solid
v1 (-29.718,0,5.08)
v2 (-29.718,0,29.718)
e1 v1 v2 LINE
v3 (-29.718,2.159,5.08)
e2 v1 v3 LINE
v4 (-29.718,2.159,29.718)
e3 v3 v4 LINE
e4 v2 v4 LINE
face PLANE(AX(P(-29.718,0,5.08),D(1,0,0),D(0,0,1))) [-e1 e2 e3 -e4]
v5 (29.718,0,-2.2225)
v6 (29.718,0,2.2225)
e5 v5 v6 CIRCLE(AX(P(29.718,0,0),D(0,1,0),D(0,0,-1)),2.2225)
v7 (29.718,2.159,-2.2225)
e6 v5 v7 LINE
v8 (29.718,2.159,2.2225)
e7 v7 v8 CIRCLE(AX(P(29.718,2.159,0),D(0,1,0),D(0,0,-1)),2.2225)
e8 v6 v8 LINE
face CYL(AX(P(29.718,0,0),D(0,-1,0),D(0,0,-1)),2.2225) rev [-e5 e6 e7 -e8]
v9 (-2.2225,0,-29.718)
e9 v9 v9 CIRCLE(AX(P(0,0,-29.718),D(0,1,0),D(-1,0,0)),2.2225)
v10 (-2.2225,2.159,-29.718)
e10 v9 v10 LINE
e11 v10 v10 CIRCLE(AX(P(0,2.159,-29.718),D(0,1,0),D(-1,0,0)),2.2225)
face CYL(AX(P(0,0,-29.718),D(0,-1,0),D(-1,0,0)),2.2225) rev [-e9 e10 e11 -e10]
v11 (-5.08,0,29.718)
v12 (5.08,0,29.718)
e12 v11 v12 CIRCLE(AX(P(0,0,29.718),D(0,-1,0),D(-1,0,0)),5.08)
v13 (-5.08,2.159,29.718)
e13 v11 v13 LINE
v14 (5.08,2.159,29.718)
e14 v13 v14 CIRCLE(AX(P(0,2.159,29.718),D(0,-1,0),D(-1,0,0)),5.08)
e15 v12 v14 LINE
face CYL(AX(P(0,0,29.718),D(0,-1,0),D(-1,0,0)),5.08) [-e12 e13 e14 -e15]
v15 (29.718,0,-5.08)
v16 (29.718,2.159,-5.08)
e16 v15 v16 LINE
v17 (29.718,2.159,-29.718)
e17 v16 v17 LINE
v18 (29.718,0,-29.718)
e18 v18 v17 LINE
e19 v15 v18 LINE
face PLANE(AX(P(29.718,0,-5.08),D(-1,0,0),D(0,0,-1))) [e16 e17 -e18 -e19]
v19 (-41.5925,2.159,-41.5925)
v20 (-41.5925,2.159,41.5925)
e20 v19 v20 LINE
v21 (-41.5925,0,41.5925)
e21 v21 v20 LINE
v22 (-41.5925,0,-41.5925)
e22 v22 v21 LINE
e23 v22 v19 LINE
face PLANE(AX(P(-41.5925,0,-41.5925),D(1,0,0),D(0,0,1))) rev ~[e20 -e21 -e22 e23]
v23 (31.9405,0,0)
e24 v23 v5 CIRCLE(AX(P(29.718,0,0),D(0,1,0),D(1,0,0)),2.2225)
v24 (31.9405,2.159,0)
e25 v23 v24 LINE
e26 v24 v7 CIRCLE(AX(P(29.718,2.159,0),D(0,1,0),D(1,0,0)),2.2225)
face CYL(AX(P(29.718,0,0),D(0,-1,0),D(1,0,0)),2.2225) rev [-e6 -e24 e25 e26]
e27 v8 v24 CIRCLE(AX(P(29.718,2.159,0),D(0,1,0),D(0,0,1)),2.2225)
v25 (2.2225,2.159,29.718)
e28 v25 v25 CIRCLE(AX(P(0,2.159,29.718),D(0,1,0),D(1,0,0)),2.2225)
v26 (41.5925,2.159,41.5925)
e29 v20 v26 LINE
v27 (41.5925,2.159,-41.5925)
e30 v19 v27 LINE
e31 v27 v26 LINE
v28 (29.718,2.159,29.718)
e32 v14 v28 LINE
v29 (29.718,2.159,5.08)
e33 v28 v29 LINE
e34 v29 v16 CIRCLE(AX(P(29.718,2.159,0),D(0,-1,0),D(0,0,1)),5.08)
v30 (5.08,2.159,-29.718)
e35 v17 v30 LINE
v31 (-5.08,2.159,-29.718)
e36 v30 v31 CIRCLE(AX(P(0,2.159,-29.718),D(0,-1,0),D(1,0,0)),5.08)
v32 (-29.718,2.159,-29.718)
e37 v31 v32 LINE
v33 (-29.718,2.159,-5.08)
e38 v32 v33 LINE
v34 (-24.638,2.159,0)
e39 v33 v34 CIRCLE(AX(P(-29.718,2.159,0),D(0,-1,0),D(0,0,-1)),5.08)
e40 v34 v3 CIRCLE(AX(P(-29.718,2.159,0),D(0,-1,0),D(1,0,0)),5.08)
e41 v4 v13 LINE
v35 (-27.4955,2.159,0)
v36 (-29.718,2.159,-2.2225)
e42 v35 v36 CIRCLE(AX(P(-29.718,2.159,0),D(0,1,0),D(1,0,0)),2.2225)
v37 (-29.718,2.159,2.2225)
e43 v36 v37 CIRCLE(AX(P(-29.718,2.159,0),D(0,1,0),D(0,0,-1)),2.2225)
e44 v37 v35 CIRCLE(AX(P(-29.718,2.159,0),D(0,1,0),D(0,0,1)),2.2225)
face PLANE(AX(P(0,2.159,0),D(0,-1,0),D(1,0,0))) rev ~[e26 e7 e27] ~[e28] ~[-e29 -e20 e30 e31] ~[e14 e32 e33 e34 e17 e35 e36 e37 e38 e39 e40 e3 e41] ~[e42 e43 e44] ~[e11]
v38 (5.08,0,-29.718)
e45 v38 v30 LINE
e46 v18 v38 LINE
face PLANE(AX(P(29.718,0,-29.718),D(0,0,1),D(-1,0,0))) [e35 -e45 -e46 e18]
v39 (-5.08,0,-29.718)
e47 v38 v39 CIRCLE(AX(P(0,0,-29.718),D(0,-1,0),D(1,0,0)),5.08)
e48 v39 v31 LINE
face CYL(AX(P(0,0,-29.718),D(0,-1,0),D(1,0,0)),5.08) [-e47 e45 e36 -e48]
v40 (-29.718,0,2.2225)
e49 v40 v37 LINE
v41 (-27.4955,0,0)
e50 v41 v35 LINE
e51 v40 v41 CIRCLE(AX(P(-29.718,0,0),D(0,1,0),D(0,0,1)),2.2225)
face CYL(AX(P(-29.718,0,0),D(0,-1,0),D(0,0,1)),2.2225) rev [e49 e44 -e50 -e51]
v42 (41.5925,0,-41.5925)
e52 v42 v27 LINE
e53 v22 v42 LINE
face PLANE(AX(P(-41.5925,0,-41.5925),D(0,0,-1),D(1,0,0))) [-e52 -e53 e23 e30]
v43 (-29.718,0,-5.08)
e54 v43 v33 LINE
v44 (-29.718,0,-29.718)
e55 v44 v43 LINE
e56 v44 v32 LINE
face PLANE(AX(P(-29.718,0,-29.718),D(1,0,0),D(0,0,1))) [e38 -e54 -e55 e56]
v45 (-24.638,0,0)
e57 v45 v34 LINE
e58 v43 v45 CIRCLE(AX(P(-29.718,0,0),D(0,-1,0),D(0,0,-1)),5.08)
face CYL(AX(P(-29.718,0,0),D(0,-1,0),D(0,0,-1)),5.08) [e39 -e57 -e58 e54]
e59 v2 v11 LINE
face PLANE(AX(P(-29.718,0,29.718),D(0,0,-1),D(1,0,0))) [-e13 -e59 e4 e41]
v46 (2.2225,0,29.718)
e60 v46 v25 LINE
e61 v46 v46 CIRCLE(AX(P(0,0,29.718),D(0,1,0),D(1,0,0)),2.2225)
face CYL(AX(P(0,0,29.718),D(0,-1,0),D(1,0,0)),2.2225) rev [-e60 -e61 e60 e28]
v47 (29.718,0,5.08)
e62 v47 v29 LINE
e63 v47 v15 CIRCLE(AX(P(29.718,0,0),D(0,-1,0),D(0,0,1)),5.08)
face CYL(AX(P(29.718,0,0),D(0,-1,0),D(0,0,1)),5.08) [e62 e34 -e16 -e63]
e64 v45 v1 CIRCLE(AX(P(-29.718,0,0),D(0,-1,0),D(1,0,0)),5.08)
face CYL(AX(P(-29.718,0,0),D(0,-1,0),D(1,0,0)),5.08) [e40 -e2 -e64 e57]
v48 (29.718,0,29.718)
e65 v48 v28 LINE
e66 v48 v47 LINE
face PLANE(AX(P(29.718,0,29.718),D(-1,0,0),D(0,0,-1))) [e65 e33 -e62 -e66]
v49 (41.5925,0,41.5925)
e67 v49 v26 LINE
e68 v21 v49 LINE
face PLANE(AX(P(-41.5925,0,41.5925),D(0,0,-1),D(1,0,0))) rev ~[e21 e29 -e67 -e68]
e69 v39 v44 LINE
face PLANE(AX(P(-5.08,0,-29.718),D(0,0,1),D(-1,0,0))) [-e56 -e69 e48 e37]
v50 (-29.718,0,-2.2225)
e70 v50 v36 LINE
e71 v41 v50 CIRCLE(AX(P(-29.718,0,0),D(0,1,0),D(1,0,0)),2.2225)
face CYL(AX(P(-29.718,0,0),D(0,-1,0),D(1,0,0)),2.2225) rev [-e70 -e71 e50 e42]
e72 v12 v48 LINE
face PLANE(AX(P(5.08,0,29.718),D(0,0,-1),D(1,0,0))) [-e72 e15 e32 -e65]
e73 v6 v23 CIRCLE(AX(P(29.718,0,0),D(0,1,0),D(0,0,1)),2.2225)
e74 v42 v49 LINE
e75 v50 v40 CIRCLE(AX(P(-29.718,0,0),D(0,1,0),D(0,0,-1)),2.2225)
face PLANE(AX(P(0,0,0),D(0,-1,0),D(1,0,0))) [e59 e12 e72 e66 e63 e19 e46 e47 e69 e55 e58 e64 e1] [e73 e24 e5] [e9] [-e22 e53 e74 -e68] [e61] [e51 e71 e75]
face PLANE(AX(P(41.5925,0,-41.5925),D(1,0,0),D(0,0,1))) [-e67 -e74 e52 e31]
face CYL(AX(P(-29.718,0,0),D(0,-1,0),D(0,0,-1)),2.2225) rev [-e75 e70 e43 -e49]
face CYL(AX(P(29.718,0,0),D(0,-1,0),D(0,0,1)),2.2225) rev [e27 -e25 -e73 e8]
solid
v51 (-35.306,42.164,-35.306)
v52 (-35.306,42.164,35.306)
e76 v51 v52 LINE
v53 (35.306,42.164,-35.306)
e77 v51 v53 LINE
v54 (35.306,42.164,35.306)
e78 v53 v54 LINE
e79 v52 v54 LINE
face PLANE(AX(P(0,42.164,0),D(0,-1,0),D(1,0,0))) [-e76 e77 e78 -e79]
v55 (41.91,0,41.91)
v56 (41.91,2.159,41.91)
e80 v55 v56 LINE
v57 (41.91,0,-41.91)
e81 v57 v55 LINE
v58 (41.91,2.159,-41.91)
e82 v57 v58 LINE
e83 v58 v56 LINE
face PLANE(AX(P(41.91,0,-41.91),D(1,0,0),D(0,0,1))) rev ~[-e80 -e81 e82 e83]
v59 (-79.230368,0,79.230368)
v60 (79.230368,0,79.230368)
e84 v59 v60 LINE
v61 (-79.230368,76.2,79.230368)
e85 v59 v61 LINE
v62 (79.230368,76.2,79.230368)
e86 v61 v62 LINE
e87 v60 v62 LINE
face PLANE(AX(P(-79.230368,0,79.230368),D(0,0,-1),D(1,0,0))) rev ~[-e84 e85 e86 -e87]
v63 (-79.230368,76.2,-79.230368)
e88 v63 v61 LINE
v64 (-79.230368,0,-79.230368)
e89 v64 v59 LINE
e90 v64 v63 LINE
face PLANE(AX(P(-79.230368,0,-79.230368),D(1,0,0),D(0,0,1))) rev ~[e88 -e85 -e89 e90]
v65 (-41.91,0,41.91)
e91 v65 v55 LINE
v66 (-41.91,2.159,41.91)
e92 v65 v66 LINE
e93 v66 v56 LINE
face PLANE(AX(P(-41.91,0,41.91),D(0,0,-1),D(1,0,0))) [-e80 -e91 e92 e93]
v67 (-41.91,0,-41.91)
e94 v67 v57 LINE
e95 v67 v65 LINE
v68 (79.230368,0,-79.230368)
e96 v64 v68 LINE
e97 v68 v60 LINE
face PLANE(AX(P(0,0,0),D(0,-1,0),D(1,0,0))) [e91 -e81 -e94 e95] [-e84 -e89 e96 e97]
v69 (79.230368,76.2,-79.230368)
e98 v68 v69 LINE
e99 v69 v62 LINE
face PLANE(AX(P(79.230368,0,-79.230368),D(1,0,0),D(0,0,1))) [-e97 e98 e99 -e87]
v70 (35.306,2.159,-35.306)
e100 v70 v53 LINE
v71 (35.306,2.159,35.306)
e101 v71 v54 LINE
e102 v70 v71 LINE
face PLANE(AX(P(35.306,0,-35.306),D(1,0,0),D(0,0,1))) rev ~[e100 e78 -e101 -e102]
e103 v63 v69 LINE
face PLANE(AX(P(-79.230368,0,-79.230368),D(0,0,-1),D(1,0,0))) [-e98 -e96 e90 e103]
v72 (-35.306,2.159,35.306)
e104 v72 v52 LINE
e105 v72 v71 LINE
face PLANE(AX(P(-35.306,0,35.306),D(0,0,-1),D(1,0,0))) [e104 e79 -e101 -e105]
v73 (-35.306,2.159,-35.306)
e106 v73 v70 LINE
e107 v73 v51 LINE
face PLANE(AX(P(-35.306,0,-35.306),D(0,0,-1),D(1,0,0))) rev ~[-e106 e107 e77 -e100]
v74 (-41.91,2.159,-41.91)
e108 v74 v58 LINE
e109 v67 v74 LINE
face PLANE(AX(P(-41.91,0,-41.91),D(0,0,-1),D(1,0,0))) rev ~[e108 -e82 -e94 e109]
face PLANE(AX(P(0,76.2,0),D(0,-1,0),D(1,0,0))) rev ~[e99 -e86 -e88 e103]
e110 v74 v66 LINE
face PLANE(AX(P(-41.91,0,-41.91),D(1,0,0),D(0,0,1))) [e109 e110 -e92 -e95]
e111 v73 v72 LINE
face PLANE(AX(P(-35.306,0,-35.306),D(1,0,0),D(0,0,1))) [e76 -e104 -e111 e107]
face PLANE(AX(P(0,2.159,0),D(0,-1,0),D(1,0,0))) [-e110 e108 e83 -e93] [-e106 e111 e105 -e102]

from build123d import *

# Parameters (mm, degrees)
F1_W     = 83.185
F1_H     = 83.185
F1_W_2   = 70.612
F1_H_2   = 70.612
F2_DEPTH = 2.159
F0_W     = 158.4607362747
F0_H     = 158.4607362747
F0_W_2   = 83.82
F0_H_2   = 83.82
F0_W_3   = 70.612
F0_H_3   = 70.612
F3_DEPTH = 76.2
F4_DEPTH = 2.159
F5_DEPTH = 42.164


with BuildPart() as f2:
    # F1 (on face) → F2 (new body)
    with BuildSketch(Plane.XZ):
        Rectangle(F1_W, F1_H)
        Rectangle(F1_W_2, F1_H_2, mode=Mode.SUBTRACT)
        Rectangle(F1_W_2, F1_H_2)
        with BuildLine():
            Line((5.08, 29.718), (29.718, 29.718))
            Line((29.718, 29.718), (29.718, 5.08))
            ThreePointArc((29.718, 5.08), (33.3101024484, 3.5921024484), (34.798, 0))
            ThreePointArc((34.798, 0), (33.3101024484, -3.5921024484), (29.718, -5.08))
            Line((29.718, -5.08), (29.718, -29.718))
            Line((29.718, -29.718), (5.08, -29.718))
            ThreePointArc((5.08, -29.718), (0, -34.798), (-5.08, -29.718))
            Line((-5.08, -29.718), (-29.718, -29.718))
            Line((-29.718, -29.718), (-29.718, -5.08))
            ThreePointArc((-29.718, -5.08), (-34.798, 0), (-29.718, 5.08))
            Line((-29.718, 5.08), (-29.718, 29.718))
            Line((-29.718, 29.718), (-5.08, 29.718))
            ThreePointArc((-5.08, 29.718), (0, 34.798), (5.08, 29.718))
        make_face(mode=Mode.SUBTRACT)
        with BuildLine():
            Line((-29.718, 2.2225), (-29.718, 5.08))
            ThreePointArc((-29.718, 5.08), (-34.798, 0), (-29.718, -5.08))
            Line((-29.718, -5.08), (-29.718, -2.2225))
            ThreePointArc((-29.718, -2.2225), (-31.9405, 0), (-29.718, 2.2225))
        make_face()
        with BuildLine():
            ThreePointArc((-24.638, 0), (-26.1258975516, 3.5921024484), (-29.718, 5.08))
            Line((-29.718, 5.08), (-29.718, 2.2225))
            ThreePointArc((-29.718, 2.2225), (-28.1464551788, 1.5715448212), (-27.4955, 0))
            ThreePointArc((-27.4955, 0), (-28.1464551788, -1.5715448212), (-29.718, -2.2225))
            Line((-29.718, -2.2225), (-29.718, -5.08))
            ThreePointArc((-29.718, -5.08), (-26.1258975516, -3.5921024484), (-24.638, 0))
        make_face()
        with BuildLine():
            ThreePointArc((-5.08, 29.718), (0, 24.638), (5.08, 29.718))
            Line((5.08, 29.718), (2.2225, 29.718))
            ThreePointArc((2.2225, 29.718), (0, 27.4955), (-2.2225, 29.718))
            Line((-2.2225, 29.718), (-5.08, 29.718))
        make_face()
        with BuildLine():
            Line((2.2225, 29.718), (5.08, 29.718))
            ThreePointArc((5.08, 29.718), (0, 34.798), (-5.08, 29.718))
            Line((-5.08, 29.718), (-2.2225, 29.718))
            ThreePointArc((-2.2225, 29.718), (0, 31.9405), (2.2225, 29.718))
        make_face()
        with BuildLine():
            Line((29.718, 2.2225), (29.718, 5.08))
            ThreePointArc((29.718, 5.08), (24.638, 0), (29.718, -5.08))
            Line((29.718, -5.08), (29.718, -2.2225))
            ThreePointArc((29.718, -2.2225), (27.4955, 0), (29.718, 2.2225))
        make_face()
        with BuildLine():
            ThreePointArc((34.798, 0), (33.3101024484, 3.5921024484), (29.718, 5.08))
            Line((29.718, 5.08), (29.718, 2.2225))
            ThreePointArc((29.718, 2.2225), (31.2895448212, 1.5715448212), (31.9405, 0))
            ThreePointArc((31.9405, 0), (31.2895448212, -1.5715448212), (29.718, -2.2225))
            Line((29.718, -2.2225), (29.718, -5.08))
            ThreePointArc((29.718, -5.08), (33.3101024484, -3.5921024484), (34.798, 0))
        make_face()
        with BuildLine():
            ThreePointArc((-5.08, -29.718), (0, -34.798), (5.08, -29.718))
            Line((5.08, -29.718), (2.2225, -29.718))
            ThreePointArc((2.2225, -29.718), (0, -31.9405), (-2.2225, -29.718))
            Line((-2.2225, -29.718), (-5.08, -29.718))
        make_face()
        with BuildLine():
            Line((2.2225, -29.718), (5.08, -29.718))
            ThreePointArc((5.08, -29.718), (0, -24.638), (-5.08, -29.718))
            Line((-5.08, -29.718), (-2.2225, -29.718))
            ThreePointArc((-2.2225, -29.718), (0, -27.4955), (2.2225, -29.718))
        make_face()
    extrude(amount=-F2_DEPTH)


with BuildPart() as f3:
    # F0 (on Front) → F3 (new body)
    with BuildSketch(Plane.XZ):
        Rectangle(F0_W, F0_H)
        Rectangle(F0_W_2, F0_H_2, mode=Mode.SUBTRACT)
        Rectangle(F0_W_2, F0_H_2)
        Rectangle(F0_W_3, F0_H_3, mode=Mode.SUBTRACT)
        Rectangle(F0_W_3, F0_H_3)
    extrude(amount=-F3_DEPTH)

    # F0 (on Front) → F4 (cut)
    with BuildSketch(Plane.XZ):
        Rectangle(F0_W_2, F0_H_2)
        Rectangle(F0_W_3, F0_H_3, mode=Mode.SUBTRACT)
        Rectangle(F0_W_3, F0_H_3)
    extrude(amount=-F4_DEPTH, mode=Mode.SUBTRACT)

    # F0 (on Front) → F5 (cut)
    with BuildSketch(Plane.XZ):
        Rectangle(F0_W_3, F0_H_3)
    extrude(amount=-F5_DEPTH, mode=Mode.SUBTRACT)


solid = Compound([f2.part, f3.part])
